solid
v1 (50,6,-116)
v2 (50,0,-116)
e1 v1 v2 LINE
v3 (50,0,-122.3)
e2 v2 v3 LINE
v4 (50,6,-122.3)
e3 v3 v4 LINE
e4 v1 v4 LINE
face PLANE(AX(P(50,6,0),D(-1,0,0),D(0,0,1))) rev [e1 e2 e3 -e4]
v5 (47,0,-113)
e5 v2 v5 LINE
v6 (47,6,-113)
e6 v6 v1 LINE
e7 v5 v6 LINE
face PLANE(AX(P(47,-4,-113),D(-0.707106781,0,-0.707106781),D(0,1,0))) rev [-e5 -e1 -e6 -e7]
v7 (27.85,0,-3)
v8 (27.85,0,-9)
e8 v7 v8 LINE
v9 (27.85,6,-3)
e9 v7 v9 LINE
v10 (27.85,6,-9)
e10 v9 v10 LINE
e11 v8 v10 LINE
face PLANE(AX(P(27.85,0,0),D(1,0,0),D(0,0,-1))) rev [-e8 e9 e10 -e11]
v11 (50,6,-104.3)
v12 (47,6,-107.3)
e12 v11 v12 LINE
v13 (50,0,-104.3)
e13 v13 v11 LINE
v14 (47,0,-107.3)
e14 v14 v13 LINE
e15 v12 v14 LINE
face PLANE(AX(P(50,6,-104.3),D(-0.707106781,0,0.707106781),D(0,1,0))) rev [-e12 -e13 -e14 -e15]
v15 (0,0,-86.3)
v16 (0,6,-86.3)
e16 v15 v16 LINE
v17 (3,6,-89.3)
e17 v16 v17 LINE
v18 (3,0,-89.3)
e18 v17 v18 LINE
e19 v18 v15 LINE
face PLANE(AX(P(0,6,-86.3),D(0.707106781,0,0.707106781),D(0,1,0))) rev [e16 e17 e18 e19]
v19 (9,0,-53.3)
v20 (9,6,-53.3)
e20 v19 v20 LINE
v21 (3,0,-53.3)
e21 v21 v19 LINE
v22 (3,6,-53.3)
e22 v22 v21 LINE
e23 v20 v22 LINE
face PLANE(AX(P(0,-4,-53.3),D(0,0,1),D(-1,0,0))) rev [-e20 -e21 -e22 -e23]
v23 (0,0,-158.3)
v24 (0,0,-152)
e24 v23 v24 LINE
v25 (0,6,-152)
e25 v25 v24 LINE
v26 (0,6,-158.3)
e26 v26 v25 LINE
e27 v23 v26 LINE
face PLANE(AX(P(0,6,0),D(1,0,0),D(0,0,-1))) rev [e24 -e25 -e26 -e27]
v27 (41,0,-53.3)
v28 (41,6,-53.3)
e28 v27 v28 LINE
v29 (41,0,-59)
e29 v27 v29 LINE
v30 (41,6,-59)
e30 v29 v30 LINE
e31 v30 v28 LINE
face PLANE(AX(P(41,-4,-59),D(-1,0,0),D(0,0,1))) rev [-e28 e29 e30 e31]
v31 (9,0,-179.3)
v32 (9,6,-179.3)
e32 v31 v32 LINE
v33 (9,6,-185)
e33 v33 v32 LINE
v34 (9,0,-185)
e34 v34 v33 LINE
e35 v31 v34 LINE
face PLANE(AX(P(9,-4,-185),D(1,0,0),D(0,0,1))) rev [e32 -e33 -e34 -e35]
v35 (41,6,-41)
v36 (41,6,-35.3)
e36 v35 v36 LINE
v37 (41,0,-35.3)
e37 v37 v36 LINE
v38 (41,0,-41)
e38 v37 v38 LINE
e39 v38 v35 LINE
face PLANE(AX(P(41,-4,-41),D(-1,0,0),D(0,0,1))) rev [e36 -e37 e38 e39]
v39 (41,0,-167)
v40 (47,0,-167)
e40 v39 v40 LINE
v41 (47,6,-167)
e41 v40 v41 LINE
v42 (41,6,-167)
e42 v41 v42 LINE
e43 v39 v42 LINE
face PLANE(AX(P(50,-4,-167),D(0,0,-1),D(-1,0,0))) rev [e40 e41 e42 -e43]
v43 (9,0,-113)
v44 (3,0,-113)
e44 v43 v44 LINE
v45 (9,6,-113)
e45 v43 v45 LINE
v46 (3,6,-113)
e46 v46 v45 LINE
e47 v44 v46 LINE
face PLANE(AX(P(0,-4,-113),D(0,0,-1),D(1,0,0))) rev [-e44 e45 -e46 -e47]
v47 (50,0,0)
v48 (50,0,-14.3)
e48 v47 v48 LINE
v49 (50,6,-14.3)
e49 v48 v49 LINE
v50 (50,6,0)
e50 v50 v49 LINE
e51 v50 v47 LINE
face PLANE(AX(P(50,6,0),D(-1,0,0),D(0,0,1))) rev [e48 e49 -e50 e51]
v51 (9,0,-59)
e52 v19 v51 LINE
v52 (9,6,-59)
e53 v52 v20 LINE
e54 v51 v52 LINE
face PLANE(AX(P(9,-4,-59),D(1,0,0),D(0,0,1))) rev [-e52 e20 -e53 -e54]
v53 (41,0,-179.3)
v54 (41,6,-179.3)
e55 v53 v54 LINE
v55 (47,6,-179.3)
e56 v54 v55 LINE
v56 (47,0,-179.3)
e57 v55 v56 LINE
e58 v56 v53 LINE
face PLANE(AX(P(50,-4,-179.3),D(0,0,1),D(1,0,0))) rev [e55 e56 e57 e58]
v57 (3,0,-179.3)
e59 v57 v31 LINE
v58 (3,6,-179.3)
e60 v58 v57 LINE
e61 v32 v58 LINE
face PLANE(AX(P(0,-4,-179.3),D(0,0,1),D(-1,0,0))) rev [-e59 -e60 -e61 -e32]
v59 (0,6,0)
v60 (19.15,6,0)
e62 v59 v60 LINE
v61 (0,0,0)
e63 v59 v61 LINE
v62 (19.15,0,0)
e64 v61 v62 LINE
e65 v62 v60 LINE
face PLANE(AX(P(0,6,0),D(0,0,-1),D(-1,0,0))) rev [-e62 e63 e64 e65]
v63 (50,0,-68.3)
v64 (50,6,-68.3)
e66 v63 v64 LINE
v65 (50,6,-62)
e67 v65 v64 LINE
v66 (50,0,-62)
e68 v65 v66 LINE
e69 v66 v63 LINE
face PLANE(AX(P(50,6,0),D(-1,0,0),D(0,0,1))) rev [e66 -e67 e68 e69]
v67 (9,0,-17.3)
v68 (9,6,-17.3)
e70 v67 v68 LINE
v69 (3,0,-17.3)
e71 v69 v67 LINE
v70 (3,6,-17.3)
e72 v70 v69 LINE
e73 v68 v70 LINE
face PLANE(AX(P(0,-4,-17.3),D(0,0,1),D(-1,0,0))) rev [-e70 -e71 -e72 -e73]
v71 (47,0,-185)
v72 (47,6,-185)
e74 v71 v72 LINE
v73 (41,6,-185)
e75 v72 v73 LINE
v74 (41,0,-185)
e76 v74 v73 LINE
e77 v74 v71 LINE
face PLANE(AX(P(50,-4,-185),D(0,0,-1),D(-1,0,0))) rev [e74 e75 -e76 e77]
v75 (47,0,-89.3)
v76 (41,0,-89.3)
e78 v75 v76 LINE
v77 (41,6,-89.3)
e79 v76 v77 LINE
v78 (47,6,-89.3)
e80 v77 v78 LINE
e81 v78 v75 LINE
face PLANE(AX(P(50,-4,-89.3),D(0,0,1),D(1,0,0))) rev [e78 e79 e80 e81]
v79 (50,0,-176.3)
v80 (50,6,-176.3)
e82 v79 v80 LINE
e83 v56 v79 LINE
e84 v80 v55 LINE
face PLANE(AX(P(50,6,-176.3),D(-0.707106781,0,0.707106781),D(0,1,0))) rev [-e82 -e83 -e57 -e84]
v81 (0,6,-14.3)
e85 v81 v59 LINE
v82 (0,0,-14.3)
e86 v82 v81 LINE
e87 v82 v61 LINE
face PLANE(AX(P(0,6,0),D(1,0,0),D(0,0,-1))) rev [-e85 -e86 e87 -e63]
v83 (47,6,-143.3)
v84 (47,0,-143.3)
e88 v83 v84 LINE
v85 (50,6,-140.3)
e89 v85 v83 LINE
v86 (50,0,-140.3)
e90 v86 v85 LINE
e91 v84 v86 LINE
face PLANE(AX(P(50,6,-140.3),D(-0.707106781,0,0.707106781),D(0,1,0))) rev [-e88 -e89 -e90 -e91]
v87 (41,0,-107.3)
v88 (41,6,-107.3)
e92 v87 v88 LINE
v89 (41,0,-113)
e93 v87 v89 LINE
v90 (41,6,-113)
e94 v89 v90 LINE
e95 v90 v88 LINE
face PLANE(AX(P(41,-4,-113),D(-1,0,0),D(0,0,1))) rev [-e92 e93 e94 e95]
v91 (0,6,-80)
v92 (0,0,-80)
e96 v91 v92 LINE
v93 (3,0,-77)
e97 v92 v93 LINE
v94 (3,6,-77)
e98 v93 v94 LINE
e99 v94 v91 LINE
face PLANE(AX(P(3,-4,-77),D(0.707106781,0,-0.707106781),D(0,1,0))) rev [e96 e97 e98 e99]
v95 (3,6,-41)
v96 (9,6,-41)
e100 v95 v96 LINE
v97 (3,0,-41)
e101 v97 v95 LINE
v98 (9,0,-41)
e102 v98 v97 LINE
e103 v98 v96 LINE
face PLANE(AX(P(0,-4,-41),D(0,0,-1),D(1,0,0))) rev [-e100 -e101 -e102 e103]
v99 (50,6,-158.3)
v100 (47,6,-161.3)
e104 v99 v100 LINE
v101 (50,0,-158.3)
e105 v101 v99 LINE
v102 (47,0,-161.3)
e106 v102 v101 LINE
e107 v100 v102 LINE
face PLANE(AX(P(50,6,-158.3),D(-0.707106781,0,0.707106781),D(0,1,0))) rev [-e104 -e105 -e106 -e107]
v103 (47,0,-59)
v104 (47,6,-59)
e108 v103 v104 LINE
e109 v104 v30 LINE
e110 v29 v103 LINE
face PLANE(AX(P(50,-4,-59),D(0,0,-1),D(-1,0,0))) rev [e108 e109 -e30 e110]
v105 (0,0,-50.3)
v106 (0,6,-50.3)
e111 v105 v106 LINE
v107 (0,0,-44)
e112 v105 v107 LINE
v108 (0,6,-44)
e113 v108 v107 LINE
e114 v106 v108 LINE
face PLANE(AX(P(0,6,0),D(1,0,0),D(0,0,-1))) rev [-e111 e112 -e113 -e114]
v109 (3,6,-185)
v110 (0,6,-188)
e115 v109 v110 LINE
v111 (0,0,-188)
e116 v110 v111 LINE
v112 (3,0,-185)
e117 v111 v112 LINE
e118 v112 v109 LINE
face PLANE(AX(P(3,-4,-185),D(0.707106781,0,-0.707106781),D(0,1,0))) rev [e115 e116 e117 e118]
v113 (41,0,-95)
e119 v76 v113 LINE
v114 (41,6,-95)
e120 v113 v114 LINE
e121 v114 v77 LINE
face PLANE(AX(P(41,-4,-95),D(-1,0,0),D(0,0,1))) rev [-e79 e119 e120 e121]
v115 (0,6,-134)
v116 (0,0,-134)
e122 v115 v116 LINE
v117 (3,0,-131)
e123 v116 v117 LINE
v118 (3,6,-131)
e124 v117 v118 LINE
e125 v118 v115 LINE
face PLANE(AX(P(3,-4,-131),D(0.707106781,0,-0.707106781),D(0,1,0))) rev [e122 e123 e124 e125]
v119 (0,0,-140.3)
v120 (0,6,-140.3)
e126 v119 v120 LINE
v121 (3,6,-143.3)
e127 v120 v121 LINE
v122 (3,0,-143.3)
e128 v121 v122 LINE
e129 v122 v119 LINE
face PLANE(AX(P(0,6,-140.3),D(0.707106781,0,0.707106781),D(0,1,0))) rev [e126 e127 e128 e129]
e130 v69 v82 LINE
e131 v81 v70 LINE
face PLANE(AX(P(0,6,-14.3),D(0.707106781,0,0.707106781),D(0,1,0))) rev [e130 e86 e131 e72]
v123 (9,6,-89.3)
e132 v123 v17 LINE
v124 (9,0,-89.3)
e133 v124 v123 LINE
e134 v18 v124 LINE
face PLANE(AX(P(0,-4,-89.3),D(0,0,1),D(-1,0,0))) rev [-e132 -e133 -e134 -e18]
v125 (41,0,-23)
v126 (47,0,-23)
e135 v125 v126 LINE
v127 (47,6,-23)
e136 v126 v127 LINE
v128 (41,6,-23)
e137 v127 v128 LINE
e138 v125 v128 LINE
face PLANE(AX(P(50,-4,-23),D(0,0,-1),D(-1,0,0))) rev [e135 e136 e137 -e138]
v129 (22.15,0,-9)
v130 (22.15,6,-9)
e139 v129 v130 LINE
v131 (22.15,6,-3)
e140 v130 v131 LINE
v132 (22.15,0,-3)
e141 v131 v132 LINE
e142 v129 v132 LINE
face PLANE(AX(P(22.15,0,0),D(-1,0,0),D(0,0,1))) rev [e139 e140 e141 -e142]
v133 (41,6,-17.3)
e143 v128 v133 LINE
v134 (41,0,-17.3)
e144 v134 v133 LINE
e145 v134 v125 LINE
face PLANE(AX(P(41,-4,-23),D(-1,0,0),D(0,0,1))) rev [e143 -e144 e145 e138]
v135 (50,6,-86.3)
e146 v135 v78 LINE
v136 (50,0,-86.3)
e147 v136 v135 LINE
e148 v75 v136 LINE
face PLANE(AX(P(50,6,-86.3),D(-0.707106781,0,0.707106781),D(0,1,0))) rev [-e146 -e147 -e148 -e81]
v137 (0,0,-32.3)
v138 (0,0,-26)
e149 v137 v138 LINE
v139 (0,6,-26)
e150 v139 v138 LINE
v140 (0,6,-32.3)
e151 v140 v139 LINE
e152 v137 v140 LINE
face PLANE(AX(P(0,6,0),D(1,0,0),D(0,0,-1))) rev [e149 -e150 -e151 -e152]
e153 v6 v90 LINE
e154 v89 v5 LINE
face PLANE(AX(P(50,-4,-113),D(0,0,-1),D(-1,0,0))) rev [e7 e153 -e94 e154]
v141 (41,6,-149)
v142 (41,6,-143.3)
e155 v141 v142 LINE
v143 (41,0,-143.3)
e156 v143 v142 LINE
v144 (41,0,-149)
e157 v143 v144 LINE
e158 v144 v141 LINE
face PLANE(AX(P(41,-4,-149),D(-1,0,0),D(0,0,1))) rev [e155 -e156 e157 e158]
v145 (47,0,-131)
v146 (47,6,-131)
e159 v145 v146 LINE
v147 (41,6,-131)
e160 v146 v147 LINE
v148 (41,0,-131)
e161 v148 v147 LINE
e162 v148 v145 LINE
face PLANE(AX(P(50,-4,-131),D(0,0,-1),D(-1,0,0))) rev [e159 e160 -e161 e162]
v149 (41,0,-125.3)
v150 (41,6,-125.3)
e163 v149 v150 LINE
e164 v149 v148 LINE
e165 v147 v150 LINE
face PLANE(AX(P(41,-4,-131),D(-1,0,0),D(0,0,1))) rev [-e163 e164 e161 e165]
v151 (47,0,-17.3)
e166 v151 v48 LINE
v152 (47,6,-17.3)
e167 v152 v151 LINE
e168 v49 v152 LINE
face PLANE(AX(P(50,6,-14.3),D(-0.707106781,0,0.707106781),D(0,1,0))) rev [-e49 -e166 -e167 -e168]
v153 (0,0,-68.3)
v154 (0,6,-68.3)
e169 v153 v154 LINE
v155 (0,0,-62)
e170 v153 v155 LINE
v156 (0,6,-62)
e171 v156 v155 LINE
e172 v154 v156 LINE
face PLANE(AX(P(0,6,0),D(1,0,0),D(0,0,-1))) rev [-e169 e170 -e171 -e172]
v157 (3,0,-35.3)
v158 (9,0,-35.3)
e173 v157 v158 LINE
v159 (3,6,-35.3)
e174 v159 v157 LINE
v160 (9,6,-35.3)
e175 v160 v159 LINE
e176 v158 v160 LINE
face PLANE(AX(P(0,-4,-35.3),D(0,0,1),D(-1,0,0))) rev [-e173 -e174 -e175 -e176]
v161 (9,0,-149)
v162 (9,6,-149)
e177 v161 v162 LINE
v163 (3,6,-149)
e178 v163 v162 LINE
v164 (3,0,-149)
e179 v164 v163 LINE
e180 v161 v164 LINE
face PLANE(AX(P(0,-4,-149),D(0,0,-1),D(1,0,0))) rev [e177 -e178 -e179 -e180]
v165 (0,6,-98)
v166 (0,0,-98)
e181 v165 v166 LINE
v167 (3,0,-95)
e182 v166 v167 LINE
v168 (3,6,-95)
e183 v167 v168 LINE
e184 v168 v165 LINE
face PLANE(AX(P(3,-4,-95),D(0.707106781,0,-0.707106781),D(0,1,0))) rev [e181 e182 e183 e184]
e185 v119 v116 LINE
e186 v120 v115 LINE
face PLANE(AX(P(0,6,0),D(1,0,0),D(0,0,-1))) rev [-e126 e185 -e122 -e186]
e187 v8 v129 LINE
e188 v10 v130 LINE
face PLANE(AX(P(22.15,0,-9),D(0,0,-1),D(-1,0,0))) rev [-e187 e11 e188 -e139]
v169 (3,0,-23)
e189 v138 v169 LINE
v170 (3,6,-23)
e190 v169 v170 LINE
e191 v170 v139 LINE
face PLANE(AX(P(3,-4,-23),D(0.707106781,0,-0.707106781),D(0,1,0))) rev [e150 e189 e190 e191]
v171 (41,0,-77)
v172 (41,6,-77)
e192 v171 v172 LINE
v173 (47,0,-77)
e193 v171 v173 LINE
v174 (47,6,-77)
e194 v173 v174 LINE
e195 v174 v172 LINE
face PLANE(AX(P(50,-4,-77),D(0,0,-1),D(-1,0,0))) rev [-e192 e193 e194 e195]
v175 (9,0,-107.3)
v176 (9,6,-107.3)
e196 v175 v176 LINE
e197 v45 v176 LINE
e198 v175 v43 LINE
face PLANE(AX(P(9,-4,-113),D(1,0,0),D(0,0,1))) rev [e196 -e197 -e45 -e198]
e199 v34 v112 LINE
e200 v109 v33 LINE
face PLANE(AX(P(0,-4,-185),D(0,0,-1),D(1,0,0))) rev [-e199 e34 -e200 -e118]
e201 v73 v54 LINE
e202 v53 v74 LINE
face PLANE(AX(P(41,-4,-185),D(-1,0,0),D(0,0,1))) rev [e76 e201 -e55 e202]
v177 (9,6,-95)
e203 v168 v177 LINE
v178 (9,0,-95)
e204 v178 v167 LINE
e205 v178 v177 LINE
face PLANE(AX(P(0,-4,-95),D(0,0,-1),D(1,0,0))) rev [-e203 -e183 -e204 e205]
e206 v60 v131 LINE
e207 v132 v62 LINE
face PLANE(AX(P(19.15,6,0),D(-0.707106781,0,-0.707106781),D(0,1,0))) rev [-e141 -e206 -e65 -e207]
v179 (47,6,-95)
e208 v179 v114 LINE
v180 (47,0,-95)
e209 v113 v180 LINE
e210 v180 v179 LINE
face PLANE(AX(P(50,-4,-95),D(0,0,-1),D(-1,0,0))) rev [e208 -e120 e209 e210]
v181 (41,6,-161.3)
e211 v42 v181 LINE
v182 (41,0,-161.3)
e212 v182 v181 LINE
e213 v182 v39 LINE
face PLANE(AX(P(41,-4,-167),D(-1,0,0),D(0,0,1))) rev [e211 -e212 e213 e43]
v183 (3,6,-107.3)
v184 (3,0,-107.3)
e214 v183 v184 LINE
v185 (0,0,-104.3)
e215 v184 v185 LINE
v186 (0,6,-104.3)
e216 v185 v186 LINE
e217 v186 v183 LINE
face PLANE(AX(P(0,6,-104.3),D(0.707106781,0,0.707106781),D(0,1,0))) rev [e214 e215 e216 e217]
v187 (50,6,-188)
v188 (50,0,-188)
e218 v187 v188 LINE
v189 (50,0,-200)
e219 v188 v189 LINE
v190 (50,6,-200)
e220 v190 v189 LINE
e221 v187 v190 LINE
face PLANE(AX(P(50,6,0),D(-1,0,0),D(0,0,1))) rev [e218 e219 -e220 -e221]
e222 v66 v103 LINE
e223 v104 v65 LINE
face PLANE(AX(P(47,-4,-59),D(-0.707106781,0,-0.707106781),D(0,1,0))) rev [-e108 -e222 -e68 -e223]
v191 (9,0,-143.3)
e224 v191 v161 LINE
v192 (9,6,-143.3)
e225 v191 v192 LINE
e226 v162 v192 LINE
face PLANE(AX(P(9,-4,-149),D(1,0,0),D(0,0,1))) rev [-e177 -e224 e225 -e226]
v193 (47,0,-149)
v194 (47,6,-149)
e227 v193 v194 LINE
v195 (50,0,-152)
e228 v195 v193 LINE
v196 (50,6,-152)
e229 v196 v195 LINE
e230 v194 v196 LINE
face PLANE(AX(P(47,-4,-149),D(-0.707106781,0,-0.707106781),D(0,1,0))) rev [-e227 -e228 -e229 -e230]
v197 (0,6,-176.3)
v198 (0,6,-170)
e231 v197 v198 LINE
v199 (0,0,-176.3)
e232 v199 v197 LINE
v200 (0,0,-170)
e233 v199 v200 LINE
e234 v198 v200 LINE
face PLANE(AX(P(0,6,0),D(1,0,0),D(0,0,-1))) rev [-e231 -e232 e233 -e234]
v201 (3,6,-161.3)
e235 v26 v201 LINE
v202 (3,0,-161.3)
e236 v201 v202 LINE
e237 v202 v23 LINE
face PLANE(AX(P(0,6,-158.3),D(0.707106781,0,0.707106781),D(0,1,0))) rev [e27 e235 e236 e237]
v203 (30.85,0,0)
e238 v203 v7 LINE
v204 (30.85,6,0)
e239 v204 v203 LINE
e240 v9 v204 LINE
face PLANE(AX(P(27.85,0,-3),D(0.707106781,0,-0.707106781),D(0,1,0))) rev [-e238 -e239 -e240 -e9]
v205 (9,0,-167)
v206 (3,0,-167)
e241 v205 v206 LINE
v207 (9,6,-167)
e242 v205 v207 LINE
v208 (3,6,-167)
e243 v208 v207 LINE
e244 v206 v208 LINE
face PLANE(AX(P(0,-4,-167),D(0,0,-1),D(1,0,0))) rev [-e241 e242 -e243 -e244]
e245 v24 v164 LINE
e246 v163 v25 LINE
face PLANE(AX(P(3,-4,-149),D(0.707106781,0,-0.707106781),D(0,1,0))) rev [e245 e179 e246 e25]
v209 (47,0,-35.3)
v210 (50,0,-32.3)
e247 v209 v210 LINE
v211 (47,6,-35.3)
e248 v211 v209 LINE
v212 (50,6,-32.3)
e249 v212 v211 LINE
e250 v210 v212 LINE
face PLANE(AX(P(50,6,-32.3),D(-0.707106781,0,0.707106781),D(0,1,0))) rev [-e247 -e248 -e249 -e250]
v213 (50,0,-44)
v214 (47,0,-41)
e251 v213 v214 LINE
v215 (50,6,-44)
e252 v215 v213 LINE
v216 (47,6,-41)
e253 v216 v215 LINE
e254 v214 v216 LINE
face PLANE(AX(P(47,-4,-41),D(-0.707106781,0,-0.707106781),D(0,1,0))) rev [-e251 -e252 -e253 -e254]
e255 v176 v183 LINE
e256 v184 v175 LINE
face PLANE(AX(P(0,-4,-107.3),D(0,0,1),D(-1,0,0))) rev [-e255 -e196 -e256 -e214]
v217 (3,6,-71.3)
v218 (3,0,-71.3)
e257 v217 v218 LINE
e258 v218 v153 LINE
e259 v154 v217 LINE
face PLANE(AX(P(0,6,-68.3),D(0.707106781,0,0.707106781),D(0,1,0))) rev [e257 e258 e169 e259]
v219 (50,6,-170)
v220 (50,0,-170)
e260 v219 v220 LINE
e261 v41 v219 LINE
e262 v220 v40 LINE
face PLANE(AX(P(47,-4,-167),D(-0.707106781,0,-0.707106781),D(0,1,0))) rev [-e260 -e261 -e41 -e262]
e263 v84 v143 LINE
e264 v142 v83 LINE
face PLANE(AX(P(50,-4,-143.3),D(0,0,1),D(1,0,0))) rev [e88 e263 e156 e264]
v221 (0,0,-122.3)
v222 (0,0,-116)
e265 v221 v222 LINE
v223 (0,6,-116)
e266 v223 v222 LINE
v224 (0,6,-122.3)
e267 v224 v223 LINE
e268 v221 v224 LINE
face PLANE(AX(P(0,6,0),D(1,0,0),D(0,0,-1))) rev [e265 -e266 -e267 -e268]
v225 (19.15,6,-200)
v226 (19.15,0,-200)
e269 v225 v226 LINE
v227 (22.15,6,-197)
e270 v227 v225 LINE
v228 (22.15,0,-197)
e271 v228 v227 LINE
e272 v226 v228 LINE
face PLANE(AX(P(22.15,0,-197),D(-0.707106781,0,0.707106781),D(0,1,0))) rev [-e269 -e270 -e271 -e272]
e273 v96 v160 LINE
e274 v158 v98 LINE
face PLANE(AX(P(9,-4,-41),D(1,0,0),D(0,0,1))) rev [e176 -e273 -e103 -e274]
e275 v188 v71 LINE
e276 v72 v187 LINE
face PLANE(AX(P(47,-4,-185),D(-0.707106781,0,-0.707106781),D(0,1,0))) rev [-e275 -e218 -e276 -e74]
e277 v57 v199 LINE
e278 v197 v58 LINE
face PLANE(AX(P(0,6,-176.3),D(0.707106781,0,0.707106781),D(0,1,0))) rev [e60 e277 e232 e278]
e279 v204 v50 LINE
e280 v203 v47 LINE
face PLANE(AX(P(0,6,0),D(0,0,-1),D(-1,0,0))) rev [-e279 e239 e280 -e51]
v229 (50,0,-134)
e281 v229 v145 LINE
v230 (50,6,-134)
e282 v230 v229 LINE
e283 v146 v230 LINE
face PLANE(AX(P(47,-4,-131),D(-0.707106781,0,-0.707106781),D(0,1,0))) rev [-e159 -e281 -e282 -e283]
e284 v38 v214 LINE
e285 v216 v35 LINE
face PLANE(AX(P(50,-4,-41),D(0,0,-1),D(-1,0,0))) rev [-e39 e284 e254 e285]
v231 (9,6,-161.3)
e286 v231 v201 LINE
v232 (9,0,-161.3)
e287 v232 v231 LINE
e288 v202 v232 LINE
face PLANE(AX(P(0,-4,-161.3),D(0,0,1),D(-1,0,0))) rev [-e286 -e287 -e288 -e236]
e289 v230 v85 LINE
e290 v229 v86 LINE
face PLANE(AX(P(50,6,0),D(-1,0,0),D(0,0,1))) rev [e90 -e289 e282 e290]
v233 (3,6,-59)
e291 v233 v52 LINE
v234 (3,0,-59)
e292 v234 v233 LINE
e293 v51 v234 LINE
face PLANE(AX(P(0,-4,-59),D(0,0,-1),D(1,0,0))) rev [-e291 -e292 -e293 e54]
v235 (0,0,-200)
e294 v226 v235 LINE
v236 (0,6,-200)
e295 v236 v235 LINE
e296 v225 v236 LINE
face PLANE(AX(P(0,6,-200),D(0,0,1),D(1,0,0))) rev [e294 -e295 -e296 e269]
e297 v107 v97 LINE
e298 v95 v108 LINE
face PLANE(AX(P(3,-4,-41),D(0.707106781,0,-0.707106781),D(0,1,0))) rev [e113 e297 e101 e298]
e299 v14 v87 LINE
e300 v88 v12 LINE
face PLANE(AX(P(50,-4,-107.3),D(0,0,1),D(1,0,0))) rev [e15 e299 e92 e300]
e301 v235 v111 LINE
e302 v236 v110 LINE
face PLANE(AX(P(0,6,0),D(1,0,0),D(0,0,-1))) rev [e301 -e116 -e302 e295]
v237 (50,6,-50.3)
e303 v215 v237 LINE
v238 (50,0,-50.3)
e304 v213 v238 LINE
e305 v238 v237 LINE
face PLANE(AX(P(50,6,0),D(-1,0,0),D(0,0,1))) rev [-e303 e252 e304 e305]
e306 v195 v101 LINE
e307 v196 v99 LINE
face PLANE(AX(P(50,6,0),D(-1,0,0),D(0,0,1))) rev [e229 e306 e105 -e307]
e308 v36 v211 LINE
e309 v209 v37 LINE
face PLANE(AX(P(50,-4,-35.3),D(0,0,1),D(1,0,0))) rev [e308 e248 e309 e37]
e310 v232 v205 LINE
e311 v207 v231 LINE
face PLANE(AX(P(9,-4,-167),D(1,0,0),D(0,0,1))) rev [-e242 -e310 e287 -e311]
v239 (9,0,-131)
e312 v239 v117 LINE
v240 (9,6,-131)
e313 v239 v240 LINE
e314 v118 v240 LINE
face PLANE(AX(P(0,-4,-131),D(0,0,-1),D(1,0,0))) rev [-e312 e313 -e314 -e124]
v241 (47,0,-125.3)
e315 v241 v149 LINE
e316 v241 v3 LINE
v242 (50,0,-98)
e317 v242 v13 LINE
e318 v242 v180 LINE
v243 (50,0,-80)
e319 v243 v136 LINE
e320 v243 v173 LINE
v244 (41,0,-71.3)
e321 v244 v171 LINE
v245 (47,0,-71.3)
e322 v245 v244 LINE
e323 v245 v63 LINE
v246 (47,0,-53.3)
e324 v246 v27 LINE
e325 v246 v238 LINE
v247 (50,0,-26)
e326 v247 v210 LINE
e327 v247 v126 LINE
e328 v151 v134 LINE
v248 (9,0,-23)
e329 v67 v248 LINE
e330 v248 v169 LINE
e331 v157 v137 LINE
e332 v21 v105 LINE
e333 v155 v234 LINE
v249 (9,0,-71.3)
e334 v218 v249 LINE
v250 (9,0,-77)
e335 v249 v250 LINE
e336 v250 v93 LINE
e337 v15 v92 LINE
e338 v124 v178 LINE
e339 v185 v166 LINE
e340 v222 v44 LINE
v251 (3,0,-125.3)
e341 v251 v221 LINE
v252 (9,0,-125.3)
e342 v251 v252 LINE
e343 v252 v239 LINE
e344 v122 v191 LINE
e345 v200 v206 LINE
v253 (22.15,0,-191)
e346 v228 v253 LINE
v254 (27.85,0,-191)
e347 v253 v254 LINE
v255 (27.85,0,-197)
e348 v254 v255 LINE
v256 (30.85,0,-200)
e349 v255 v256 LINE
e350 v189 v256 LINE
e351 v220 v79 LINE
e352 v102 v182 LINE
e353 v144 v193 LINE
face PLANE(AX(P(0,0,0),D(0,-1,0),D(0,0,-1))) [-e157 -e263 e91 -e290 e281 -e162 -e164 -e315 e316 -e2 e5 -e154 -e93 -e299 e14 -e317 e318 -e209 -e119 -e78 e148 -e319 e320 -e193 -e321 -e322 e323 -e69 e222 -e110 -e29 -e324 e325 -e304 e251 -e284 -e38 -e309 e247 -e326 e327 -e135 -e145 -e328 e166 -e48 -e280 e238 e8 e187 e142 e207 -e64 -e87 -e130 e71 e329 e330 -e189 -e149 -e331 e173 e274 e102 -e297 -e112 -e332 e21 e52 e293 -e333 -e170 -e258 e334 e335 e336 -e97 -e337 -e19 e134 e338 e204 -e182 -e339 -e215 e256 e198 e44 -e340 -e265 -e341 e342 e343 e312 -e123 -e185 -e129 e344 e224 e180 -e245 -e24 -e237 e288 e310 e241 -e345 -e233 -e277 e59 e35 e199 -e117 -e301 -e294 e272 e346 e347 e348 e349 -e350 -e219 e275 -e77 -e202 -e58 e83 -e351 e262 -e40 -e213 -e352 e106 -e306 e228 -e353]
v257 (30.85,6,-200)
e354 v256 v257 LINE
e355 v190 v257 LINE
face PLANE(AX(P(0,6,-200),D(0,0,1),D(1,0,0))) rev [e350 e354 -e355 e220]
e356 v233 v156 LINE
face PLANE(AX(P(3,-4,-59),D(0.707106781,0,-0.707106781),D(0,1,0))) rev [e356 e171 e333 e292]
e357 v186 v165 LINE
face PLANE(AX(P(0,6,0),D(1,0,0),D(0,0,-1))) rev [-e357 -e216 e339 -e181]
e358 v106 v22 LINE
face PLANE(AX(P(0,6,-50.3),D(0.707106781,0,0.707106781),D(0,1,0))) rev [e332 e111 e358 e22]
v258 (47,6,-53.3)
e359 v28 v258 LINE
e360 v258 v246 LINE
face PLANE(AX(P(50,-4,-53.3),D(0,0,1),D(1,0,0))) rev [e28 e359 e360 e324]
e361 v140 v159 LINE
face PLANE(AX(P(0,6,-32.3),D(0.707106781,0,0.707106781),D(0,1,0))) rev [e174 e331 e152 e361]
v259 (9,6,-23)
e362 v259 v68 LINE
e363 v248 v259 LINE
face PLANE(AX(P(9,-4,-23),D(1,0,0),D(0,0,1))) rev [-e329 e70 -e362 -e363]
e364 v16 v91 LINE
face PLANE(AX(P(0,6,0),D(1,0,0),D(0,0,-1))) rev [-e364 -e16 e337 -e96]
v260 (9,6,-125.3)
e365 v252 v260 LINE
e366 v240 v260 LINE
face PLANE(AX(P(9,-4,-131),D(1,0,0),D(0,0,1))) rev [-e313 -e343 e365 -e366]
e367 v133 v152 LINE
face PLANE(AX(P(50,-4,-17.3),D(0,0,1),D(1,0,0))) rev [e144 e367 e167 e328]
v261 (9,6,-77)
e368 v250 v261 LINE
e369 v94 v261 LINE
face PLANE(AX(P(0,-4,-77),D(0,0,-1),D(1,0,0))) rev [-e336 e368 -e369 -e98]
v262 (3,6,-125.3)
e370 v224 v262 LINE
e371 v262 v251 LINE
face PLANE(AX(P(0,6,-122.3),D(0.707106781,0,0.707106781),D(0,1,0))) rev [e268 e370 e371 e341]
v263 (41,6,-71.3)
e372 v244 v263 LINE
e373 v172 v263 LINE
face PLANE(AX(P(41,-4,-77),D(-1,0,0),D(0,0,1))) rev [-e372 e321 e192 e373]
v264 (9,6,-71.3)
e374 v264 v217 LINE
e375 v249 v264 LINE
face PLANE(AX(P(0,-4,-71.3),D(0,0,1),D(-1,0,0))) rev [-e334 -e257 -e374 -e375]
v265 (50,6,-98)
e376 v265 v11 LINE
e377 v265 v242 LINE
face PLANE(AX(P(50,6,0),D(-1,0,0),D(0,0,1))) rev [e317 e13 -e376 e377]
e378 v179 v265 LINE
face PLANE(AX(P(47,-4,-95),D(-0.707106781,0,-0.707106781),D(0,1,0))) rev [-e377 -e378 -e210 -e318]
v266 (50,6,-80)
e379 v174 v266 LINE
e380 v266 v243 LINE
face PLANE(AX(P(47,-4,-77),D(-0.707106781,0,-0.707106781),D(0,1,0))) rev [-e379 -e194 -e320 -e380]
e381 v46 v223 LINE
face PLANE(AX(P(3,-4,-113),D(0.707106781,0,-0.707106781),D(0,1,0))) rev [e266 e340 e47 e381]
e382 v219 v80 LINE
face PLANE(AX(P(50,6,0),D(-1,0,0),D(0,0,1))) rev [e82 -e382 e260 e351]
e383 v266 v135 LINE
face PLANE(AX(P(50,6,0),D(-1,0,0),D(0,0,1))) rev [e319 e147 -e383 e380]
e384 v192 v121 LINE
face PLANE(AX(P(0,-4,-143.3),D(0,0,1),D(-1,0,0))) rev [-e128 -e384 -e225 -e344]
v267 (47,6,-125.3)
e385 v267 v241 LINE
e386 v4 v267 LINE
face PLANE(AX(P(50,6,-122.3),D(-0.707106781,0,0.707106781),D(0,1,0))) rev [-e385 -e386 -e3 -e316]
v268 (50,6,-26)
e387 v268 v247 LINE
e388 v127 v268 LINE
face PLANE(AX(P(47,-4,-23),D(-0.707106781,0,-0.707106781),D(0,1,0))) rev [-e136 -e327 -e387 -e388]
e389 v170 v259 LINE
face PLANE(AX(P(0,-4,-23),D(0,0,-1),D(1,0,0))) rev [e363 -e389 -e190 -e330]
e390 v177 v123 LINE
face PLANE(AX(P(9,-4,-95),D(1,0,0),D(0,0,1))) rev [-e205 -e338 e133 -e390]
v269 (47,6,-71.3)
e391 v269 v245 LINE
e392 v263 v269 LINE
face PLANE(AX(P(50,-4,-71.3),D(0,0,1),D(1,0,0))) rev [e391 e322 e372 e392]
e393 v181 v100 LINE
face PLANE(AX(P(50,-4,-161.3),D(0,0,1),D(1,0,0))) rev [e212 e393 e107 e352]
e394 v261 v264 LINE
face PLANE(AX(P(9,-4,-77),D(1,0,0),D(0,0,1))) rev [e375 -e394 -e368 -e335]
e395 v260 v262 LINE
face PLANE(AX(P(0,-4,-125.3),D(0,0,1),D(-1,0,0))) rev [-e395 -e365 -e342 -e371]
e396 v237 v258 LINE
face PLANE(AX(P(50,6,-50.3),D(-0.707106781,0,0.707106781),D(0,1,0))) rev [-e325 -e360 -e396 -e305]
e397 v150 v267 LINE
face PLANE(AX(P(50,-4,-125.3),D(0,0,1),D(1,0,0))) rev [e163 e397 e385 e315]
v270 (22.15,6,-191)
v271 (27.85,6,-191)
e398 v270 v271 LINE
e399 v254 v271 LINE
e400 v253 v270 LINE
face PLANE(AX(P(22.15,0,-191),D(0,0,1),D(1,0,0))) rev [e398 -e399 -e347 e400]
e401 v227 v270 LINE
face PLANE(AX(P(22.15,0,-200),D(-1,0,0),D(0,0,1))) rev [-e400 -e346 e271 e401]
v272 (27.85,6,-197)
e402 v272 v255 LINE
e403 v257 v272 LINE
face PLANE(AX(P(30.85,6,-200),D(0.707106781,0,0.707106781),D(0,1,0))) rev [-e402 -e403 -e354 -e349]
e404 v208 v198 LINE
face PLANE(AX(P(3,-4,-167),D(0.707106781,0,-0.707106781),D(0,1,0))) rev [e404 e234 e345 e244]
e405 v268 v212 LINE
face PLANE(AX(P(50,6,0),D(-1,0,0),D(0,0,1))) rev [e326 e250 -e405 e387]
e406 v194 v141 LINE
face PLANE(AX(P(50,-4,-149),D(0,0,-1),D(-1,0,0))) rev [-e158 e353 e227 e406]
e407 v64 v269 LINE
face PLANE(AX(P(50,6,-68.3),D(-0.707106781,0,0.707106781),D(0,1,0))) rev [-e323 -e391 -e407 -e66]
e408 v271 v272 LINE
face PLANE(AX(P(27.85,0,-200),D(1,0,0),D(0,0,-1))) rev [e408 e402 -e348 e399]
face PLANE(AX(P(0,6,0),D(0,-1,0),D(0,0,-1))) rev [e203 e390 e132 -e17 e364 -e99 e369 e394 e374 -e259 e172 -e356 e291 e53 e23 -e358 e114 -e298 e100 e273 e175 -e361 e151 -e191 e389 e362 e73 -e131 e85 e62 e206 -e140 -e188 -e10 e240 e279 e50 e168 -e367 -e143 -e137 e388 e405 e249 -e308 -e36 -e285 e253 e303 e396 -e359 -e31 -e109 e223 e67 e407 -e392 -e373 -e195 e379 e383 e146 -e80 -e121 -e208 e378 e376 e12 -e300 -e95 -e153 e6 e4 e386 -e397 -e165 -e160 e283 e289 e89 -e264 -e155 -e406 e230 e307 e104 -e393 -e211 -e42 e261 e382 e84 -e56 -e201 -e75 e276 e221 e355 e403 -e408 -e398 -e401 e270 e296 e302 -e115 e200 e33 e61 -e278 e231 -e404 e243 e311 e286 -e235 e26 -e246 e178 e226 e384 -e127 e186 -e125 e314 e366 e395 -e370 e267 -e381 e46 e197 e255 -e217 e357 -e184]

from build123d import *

# Parameters (mm, degrees)
SKETCH1_W                  = 50
SKETCH1_H                  = 200
BOSS_EXTRUDE1_DEPTH        = 6
SKETCH2_W                  = 5.7
SKETCH2_H                  = 9
CUT_EXTRUDE1_DEPTH         = 6
CHAMFER2_SIZE              = 3
SKETCH3_W                  = 9
SKETCH3_H                  = 5.7
CUT_EXTRUDE2_DEPTH         = 10
CHAMFER3_SIZE              = 3
LPATTERN1_COUNT            = 10
LPATTERN1_PITCH            = 18
CHAMFER3_OF_LPATTERN1_SIZE = 3
MIRROR3_DEPTH              = 6


# Read off the part's stored shape, not the designer's step: Mirror3
with BuildPart() as part:
    # Sketch1 → Boss-Extrude1 (new body)
    with BuildSketch(Plane(origin=(0, 0, 0), x_dir=(1, 0, 0), z_dir=(0, 1, 0))):
        with Locations((25, 100)):
            Rectangle(SKETCH1_W, SKETCH1_H)
    extrude(amount=BOSS_EXTRUDE1_DEPTH)

    # Sketch2 → Cut-Extrude1 (cut)
    with BuildSketch(Plane(origin=(0, 6, 0), x_dir=(1, 0, 0), z_dir=(0, 1, 0))):
        with Locations((25, 195.5)):
            Rectangle(SKETCH2_W, SKETCH2_H)
        with Locations((25, 4.5)):
            Rectangle(SKETCH2_W, SKETCH2_H)
    extrude(amount=-CUT_EXTRUDE1_DEPTH, mode=Mode.SUBTRACT)

    # Chamfer2
    chamfer2_edges = [part.edges().sort_by_distance(p)[0] for p in [
        (22.15, 3, -200),
        (27.85, 3, -200),
        (27.85, 3, 0),
        (22.15, 3, 0),
    ]]
    chamfer(chamfer2_edges, length=CHAMFER2_SIZE)

    # Sketch3 → Cut-Extrude2 (cut)
    with BuildSketch(Plane(origin=(0, 6, 0), x_dir=(1, 0, 0), z_dir=(0, 1, 0))):
        with Locations((45.5, 182.15)):
            Rectangle(SKETCH3_W, SKETCH3_H)
    cut_extrude2 = extrude(amount=-CUT_EXTRUDE2_DEPTH, mode=Mode.SUBTRACT)

    # Chamfer3
    chamfer3_edges = [part.edges().sort_by_distance(p)[0] for p in [
        (50, 3, -185),
        (50, 3, -179.3),
    ]]
    chamfer(chamfer3_edges, length=CHAMFER3_SIZE)

    # LPattern1: Cut-Extrude2 ×10
    with Locations(*[(0, 0, i * LPATTERN1_PITCH) for i in range(1, LPATTERN1_COUNT)]):
        add(cut_extrude2, mode=Mode.SUBTRACT)

    # Chamfer3 of LPattern1
    chamfer3_of_lpattern1_edges = [part.edges().sort_by_distance(p)[0] for p in [
        (50, 3, -167),
        (50, 3, -161.3),
        (50, 3, -149),
        (50, 3, -143.3),
        (50, 3, -131),
        (50, 3, -125.3),
        (50, 3, -113),
        (50, 3, -107.3),
        (50, 3, -95),
        (50, 3, -89.3),
        (50, 3, -77),
        (50, 3, -71.3),
        (50, 3, -59),
        (50, 3, -53.3),
        (50, 3, -41),
        (50, 3, -35.3),
        (50, 3, -23),
        (50, 3, -17.3),
    ]]
    chamfer(chamfer3_of_lpattern1_edges, length=CHAMFER3_OF_LPATTERN1_SIZE)

    # Mirror3 outline → Mirror3 (cut)
    with BuildSketch(Plane(origin=(0, 0, 0), x_dir=(1, 0, 0), z_dir=(0, 1, 0))):
        Polygon((0, 176.3), (3, 179.3), (9, 179.3), (9, 185), (3, 185), (0, 188), align=None)
        Polygon((3, 23), (0, 26), (0, 14.3), (3, 17.3), (9, 17.3), (9, 23), align=None)
        Polygon((3, 41), (0, 44), (0, 32.3), (3, 35.3), (9, 35.3), (9, 41), align=None)
        Polygon((3, 59), (0, 62), (0, 50.3), (3, 53.3), (9, 53.3), (9, 59), align=None)
        Polygon((3, 77), (0, 80), (0, 68.3), (3, 71.3), (9, 71.3), (9, 77), align=None)
        Polygon((3, 95), (0, 98), (0, 86.3), (3, 89.3), (9, 89.3), (9, 95), align=None)
        Polygon((3, 113), (0, 116), (0, 104.3), (3, 107.3), (9, 107.3), (9, 113), align=None)
        Polygon((3, 131), (0, 134), (0, 122.3), (3, 125.3), (9, 125.3), (9, 131), align=None)
        Polygon((3, 149), (0, 152), (0, 140.3), (3, 143.3), (9, 143.3), (9, 149), align=None)
        Polygon((3, 167), (0, 170), (0, 158.3), (3, 161.3), (9, 161.3), (9, 167), align=None)
    extrude(amount=MIRROR3_DEPTH, mode=Mode.SUBTRACT)


solid = part.part
